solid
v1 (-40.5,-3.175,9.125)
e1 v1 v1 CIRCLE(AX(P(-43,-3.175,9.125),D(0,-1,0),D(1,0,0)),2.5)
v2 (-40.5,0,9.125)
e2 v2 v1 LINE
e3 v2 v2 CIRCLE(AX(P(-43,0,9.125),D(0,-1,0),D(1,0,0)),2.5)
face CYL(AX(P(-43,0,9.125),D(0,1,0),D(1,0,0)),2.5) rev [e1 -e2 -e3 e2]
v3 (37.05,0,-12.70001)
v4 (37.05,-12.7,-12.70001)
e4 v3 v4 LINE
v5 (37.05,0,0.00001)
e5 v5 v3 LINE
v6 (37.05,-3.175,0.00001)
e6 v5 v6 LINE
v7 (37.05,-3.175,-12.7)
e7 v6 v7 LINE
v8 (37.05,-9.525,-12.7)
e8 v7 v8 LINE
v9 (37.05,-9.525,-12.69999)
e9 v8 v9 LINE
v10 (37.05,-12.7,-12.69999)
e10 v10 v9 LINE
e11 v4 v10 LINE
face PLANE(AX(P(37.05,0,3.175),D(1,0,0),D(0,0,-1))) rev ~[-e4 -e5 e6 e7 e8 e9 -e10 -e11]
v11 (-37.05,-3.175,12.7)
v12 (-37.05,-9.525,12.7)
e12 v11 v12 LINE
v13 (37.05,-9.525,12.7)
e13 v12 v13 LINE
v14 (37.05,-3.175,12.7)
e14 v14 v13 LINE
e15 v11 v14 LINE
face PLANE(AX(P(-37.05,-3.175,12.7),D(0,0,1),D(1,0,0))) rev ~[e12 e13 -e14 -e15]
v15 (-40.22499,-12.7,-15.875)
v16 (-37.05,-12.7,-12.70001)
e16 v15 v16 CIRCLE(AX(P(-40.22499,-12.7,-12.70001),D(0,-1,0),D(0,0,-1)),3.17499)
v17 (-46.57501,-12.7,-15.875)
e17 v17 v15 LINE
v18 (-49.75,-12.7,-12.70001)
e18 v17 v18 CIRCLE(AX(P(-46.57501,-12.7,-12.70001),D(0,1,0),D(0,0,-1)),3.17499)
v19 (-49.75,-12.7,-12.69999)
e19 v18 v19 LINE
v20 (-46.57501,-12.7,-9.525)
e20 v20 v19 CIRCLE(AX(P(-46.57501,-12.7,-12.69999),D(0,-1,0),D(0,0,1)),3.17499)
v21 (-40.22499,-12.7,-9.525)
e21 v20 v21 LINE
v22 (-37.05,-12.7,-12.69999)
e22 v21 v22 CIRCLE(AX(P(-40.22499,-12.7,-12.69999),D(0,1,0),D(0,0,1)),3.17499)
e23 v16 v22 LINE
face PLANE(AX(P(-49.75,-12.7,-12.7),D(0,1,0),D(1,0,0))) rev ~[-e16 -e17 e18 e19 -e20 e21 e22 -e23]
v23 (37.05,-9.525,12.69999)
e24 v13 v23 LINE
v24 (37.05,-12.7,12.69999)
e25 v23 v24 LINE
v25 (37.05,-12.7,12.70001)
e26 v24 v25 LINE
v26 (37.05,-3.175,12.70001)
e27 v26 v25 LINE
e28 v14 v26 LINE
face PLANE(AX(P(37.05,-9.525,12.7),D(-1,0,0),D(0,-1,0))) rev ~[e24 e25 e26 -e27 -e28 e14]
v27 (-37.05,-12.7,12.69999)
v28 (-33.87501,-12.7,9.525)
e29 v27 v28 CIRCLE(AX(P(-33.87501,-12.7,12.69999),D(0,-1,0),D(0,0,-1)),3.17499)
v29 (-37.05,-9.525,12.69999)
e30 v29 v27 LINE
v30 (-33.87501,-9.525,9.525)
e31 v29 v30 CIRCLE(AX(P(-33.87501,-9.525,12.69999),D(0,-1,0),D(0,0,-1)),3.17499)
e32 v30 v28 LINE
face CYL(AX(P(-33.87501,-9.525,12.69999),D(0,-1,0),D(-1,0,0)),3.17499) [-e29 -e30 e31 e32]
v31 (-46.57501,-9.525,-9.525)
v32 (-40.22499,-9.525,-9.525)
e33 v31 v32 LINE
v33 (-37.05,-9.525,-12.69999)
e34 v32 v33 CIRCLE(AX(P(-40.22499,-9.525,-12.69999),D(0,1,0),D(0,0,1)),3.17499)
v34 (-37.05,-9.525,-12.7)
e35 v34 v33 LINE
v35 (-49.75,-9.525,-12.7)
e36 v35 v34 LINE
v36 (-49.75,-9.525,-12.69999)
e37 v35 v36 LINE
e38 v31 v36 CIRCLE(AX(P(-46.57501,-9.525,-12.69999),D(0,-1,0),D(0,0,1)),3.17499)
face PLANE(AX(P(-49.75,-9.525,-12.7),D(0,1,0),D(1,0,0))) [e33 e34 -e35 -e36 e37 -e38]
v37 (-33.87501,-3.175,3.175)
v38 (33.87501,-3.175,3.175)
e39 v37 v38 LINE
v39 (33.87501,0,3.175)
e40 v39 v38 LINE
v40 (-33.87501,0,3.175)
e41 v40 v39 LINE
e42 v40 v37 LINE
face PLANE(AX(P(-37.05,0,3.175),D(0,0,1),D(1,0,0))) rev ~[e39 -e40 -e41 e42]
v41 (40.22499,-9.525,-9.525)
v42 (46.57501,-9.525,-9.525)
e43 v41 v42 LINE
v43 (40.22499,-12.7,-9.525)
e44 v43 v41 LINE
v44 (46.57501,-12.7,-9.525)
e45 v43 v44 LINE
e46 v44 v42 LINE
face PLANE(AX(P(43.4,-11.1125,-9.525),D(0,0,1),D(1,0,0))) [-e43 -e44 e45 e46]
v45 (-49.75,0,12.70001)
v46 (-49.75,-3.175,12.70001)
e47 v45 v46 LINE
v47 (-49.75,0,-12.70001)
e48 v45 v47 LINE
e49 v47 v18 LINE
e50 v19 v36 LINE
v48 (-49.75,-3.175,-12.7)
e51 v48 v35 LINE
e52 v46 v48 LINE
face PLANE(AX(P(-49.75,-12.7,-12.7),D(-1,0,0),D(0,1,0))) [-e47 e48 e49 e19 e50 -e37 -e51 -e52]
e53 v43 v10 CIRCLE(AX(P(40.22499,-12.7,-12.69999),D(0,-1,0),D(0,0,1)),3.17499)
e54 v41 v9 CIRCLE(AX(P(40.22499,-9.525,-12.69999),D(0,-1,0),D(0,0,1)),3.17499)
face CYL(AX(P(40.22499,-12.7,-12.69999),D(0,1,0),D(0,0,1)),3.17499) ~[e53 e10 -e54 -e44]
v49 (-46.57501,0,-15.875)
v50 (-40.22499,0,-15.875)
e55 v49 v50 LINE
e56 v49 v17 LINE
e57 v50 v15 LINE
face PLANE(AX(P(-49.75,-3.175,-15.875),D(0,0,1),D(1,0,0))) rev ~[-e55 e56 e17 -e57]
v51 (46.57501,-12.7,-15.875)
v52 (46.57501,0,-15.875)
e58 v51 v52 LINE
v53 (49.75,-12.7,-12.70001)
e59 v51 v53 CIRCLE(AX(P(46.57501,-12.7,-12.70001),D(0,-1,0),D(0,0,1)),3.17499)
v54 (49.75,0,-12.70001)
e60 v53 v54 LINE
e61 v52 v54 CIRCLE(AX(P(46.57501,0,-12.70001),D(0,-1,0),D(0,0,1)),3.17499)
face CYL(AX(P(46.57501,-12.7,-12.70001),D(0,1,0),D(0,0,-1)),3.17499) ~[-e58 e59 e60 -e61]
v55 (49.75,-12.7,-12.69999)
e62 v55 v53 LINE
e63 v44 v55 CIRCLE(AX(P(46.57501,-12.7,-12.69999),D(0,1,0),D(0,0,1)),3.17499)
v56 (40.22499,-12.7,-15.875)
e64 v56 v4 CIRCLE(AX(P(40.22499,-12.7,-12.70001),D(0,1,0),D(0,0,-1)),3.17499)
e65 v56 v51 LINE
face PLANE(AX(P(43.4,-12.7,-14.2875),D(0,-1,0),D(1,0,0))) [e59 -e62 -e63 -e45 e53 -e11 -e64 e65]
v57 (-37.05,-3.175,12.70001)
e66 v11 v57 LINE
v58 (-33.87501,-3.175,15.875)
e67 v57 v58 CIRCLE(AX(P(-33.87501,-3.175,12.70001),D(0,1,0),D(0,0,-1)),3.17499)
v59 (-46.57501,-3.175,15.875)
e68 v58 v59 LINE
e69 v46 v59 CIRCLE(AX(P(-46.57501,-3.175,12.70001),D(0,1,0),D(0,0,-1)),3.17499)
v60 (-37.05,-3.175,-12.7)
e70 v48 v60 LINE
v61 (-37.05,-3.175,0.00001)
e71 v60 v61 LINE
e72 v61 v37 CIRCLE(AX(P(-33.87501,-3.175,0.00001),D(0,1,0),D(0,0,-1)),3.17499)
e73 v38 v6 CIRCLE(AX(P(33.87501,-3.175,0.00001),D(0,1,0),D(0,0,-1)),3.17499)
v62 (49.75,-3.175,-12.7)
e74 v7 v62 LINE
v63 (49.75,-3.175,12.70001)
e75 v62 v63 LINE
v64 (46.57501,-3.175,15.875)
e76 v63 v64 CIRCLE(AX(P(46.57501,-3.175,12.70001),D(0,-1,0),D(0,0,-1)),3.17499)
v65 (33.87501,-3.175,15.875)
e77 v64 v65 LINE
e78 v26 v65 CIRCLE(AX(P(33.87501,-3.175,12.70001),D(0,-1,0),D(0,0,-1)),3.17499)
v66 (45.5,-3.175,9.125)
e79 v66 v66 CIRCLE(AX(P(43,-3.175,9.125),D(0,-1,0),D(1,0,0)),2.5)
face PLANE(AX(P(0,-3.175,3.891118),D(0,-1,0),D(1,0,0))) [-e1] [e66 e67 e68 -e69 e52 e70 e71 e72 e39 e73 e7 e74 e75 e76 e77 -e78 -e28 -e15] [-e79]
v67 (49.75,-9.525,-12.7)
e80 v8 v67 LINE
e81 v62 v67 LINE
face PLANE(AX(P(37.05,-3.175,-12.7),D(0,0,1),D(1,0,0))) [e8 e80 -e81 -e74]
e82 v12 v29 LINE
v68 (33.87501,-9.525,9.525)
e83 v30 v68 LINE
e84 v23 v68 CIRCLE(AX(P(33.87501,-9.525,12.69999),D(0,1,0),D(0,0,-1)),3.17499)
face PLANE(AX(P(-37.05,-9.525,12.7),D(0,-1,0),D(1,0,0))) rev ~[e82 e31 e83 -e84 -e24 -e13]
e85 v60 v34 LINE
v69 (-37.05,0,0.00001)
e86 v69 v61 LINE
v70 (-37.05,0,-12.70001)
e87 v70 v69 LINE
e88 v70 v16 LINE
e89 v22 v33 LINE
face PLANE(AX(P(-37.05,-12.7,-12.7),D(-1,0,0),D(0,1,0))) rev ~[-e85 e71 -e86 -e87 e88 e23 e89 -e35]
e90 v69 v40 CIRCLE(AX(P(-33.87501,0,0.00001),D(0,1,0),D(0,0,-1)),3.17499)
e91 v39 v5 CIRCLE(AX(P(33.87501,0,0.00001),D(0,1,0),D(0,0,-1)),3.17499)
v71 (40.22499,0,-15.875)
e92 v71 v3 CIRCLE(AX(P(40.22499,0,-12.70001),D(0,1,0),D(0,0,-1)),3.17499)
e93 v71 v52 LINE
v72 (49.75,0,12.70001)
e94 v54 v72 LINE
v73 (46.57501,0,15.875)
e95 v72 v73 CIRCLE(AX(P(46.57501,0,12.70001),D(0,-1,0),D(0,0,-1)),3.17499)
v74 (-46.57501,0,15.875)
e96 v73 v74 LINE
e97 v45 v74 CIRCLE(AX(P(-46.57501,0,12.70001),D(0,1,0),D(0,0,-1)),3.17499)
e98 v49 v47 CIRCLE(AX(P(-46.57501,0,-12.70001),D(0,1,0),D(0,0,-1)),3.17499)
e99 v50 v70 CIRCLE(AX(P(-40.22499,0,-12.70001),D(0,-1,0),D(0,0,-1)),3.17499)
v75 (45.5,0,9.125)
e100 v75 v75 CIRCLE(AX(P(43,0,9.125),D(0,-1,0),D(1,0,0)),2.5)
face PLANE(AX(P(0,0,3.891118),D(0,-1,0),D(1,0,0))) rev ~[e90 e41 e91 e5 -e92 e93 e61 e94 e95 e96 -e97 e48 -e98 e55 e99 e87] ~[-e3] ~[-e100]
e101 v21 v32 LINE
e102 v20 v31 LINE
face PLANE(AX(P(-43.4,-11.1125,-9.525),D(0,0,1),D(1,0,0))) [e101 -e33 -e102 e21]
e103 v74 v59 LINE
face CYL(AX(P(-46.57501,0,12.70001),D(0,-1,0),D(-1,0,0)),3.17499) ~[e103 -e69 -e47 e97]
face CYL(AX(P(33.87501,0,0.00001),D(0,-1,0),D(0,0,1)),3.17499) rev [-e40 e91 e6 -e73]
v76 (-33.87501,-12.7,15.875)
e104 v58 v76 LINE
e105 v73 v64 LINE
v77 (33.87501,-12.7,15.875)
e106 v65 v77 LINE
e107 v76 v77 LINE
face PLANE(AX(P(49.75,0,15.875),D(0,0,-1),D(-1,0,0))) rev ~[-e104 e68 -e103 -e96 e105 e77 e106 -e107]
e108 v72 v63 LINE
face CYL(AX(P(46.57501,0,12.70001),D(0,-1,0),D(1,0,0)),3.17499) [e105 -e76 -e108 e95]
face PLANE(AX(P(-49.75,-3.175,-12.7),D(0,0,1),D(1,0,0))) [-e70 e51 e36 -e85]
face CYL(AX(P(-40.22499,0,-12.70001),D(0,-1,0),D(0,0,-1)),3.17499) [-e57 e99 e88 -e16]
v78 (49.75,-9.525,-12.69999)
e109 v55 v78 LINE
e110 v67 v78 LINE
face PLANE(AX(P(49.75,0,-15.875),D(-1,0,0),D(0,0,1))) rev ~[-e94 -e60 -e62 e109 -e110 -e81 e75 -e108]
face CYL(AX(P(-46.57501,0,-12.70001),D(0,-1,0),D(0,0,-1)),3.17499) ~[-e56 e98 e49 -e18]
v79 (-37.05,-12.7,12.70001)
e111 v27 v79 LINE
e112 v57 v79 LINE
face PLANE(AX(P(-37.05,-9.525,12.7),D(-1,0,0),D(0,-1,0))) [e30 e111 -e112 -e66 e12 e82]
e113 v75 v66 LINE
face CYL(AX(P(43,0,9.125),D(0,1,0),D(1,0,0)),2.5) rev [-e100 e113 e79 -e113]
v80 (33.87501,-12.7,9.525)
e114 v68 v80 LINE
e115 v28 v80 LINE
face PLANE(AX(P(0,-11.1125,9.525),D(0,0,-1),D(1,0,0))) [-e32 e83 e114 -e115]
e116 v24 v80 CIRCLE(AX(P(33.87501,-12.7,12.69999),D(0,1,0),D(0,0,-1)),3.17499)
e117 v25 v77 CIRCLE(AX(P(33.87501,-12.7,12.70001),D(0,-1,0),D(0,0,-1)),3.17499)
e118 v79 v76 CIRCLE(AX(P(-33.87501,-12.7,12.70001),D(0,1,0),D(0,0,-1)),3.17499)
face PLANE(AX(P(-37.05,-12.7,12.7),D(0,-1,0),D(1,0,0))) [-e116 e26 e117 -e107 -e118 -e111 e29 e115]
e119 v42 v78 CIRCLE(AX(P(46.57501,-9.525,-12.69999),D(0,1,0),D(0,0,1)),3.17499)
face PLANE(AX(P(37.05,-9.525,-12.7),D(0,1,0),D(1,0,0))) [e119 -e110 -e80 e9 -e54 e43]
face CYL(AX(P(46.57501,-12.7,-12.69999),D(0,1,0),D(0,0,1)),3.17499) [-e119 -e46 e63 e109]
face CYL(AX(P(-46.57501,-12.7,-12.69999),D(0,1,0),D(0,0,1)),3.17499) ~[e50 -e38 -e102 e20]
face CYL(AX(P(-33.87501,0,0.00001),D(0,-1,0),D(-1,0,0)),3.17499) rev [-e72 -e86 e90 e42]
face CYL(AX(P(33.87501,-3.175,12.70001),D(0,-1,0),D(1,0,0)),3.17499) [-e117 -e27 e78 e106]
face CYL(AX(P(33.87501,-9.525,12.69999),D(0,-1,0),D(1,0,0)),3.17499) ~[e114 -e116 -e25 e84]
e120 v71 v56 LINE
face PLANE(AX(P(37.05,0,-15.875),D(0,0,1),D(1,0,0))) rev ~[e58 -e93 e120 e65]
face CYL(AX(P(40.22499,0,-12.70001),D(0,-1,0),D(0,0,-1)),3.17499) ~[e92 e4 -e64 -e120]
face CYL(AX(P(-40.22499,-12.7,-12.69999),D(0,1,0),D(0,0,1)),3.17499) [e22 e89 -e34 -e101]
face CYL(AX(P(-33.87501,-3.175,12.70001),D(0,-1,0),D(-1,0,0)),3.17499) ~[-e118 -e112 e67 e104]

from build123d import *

# Parameters (mm, degrees)
F0_R     = 2.5
F1_DEPTH = 3.175
F2_W     = 12.7
F2_H     = 3.175
F2_W_2   = 74.1
F3_DEPTH = 9.525
F4_W     = 12.7
F4_H     = 3.175
F5_DEPTH = 3.175
F6_W     = 74.1
F6_H     = 3.175
F7_DEPTH = 3.175
F8_R     = 3.17499


# Not quite as in the source:
# - a fillet or chamfer is up to 0.001 mm smaller than in the source, because OpenCascade refuses the exact size


with BuildPart() as f1:
    # F0 (on Front) → F1 (new body)
    with BuildSketch(Plane.XZ):
        Polygon((49.75, -15.875), (49.75, 15.875), (-49.75, 15.875), (-49.75, -15.875), (-37.05, -15.875), (-37.05, 3.175), (37.05, 3.175), (37.05, -15.875), align=None)
        with Locations((-43, 9.125)):
            Circle(F0_R, mode=Mode.SUBTRACT)
        with Locations((43, 9.125)):
            Circle(F0_R, mode=Mode.SUBTRACT)
    extrude(amount=F1_DEPTH)

    # F2 (on face) → F3 (join)
    with BuildSketch(Plane.XZ.offset(3.175)):
        with Locations((-43.4, -14.2875)):
            Rectangle(F2_W, F2_H)
        with Locations((43.4, -14.2875)):
            Rectangle(F2_W, F2_H)
        with Locations((0, 14.2875)):
            Rectangle(F2_W_2, F2_H)
    extrude(amount=F3_DEPTH)

    # F4 (on face) → F5 (join)
    with BuildSketch(Plane.XY.offset(-12.7)):
        with Locations((-43.4, -11.1125)):
            Rectangle(F4_W, F4_H)
        with Locations((43.4, -11.1125)):
            Rectangle(F4_W, F4_H)
    extrude(amount=F5_DEPTH)

    # F6 (on face) → F7 (join)
    with BuildSketch(Plane(origin=(0, 0, 12.7), x_dir=(1, 0, 0), z_dir=(0, 0, -1))):
        with Locations((0, 11.1125)):
            Rectangle(F6_W, F6_H)
    extrude(amount=F7_DEPTH)

    # F8 (radius 3.175 in the source; OpenCascade refuses exactly that, so slightly less here)
    f8_edges = [f1.edges().sort_by_distance(p)[0] for p in [
        (-49.75, -1.5875, 15.875),
        (-49.75, -6.35, -15.875),
        (-37.05, -6.35, -15.875),
        (49.75, -6.35, -15.875),
        (37.05, -6.35, -15.875),
        (49.75, -1.5875, 15.875),
        (37.05, -1.5875, 3.175),
        (-37.05, -1.5875, 3.175),
        (-49.75, -11.1125, -9.525),
        (-37.05, -11.1125, -9.525),
        (49.75, -11.1125, -9.525),
        (37.05, -11.1125, -9.525),
        (-37.05, -7.9375, 15.875),
        (-37.05, -11.1125, 9.525),
        (37.05, -7.9375, 15.875),
        (37.05, -11.1125, 9.525),
    ]]
    fillet(f8_edges, radius=F8_R)


solid = f1.part
